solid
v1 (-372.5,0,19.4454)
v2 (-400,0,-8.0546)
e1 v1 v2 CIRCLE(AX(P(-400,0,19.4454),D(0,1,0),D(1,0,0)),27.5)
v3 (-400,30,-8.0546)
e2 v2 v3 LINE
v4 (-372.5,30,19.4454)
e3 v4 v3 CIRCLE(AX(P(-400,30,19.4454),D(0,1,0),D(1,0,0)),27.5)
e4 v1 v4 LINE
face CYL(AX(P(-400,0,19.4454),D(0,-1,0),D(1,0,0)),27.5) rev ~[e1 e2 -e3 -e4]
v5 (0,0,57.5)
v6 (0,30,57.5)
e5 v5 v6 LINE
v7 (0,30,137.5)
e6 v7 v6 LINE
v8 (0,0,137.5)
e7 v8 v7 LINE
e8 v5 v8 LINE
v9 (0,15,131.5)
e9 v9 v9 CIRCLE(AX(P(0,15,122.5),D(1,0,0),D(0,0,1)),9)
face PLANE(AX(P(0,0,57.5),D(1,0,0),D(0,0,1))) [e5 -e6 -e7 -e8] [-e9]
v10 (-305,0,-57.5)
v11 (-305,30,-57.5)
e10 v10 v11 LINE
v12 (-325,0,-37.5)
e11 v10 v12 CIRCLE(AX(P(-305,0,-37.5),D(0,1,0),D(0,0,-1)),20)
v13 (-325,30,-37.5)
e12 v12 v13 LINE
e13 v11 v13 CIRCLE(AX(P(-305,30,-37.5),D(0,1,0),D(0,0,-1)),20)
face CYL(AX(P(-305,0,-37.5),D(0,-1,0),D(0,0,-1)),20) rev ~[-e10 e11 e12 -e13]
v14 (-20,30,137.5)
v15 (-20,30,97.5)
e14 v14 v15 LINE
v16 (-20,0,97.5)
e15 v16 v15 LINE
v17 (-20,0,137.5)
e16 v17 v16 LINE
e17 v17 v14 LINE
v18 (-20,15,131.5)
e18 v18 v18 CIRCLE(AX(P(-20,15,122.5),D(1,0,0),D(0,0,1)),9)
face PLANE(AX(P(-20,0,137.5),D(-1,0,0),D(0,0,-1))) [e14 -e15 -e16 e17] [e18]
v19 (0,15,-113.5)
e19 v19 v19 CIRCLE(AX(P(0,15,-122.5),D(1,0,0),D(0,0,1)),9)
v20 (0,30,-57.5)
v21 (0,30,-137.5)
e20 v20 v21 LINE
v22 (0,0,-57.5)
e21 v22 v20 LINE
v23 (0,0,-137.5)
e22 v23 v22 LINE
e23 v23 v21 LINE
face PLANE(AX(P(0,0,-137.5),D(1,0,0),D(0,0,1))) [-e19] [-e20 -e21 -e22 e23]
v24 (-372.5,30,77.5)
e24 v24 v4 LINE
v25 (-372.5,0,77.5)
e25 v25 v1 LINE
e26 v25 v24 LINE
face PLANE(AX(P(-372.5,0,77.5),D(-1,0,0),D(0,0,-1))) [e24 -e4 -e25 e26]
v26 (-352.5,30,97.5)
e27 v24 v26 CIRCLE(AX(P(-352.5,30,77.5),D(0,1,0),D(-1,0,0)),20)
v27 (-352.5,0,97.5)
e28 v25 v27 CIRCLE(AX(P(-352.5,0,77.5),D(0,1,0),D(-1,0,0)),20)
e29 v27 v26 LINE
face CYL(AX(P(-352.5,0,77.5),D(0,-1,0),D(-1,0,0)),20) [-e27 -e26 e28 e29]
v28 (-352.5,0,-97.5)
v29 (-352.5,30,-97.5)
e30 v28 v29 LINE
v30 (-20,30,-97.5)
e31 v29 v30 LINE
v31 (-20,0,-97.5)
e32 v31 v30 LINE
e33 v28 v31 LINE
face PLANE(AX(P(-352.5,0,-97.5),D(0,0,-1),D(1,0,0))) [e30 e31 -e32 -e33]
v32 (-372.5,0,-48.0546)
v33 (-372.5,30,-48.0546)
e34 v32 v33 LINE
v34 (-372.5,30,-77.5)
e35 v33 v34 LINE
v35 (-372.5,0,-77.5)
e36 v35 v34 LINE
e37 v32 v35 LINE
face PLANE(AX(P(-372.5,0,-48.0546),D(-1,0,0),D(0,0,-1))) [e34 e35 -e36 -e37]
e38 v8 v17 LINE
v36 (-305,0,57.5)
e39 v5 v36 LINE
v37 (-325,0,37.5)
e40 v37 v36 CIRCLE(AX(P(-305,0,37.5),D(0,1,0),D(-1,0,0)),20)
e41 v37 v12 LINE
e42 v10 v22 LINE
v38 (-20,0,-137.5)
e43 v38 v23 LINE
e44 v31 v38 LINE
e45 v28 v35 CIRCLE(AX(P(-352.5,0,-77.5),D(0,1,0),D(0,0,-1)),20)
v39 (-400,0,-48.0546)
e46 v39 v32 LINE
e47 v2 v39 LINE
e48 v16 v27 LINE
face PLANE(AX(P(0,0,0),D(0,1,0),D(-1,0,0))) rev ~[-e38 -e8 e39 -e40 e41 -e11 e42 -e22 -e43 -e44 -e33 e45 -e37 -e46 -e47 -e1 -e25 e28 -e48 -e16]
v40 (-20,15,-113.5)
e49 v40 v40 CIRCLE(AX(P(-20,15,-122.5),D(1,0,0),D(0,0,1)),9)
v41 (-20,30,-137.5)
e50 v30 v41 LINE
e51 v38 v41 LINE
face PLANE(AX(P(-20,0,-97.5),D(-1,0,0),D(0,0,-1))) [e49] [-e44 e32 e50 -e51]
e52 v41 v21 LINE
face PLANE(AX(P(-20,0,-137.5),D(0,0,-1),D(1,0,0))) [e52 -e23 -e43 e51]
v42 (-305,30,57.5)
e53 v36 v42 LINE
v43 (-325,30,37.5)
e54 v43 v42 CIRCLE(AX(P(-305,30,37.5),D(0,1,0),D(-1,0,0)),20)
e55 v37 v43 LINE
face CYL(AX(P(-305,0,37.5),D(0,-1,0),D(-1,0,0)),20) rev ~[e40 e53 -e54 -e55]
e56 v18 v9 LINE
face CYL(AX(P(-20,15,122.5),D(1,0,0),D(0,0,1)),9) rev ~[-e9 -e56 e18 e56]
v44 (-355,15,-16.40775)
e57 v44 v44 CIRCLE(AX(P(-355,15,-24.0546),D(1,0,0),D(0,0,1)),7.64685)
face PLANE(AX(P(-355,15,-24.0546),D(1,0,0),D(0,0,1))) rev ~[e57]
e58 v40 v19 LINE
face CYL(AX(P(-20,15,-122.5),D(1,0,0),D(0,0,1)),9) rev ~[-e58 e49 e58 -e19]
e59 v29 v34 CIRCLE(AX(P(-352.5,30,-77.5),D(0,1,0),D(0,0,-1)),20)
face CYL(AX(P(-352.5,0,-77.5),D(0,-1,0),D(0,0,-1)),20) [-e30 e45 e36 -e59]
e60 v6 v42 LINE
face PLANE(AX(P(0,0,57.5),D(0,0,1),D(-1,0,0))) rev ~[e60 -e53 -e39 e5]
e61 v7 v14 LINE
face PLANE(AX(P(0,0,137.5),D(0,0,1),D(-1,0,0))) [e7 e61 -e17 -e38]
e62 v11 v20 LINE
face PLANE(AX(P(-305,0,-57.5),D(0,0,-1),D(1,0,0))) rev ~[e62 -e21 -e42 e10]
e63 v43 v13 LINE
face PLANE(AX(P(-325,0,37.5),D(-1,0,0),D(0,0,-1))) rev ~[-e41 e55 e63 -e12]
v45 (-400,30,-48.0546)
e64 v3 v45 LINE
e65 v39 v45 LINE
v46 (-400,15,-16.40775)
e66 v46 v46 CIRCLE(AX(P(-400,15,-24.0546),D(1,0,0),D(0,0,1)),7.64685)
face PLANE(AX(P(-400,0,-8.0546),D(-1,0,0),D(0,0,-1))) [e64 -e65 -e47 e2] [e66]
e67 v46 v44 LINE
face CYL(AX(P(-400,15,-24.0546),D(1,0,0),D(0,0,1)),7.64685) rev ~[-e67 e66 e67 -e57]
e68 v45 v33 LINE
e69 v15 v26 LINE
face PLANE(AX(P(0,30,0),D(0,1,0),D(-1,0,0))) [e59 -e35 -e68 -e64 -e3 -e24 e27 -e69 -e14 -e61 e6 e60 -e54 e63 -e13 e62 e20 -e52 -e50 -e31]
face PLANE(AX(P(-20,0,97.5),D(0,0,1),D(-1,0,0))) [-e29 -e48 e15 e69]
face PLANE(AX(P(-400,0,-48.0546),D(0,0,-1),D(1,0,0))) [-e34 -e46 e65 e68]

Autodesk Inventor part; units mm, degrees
ref_plane "YZ Plane" through (0, 0, 0) normal (1, 0, 0) x (0, 1, 0)
ref_plane "XZ Plane" through (0, 0, 0) normal (0, 1, 0) x (-1, 0, 0)
ref_plane "XY Plane" through (0, 0, 0) normal (0, 0, 1) x (1, 0, 0)
sketch "Skizze1" plane through (0, 0, 0) normal (0, 1, 0) x (-1, 0, 0)
  line L0 (0, 0) -> (380.5546, 0) construction
  line L1 (20, 97.5) -> (352.5, 97.5)
  line L2 (352.5, -97.5) -> (20, -97.5)
  line L3 (0, 76.1809) -> (0, 137.5)
  line L4 (0, 137.5) -> (20, 137.5)
  line L5 (20, 137.5) -> (20, 97.5)
  line L6 (20, -97.5) -> (20, -137.5)
  line L7 (20, -137.5) -> (0, -137.5)
  line L8 (0, -137.5) -> (0, -73.203)
  line L9 (400, -8.0546) -> (400, -8.0546)
  line L10 (400, -8.0546) -> (400, -48.0546)
  line L11 (400, -48.0546) -> (372.5, -48.0546)
  line L12 (0, 57.5) -> (305, 57.5)
  line L13 (325, 37.5) -> (325, -37.5)
  line L14 (305, -57.5) -> (0, -57.5)
  line L15 (0, -73.203) -> (0, -57.5)
  line L16 (0, 57.5) -> (0, 76.1809)
  line L17 (372.5, 77.5) -> (372.5, 19.4454)
  line L18 (372.5, -48.0546) -> (372.5, -77.5)
  arc A0 (372.5, 19.4454) -> (400, -8.0546) centre (400, 19.4454) ccw
  arc A1 (372.5, 77.5) -> (352.5, 97.5) centre (352.5, 77.5) ccw
  arc A2 (352.5, -97.5) -> (372.5, -77.5) centre (352.5, -77.5) ccw
  arc A3 (325, 37.5) -> (305, 57.5) centre (305, 37.5) ccw
  arc A4 (305, -57.5) -> (325, -37.5) centre (305, -37.5) ccw
  point P0 (372.5, 48.4727)
  dimension "d3" = 57.5
  dimension "d4" = 57.5
  dimension "d7" = 20
  dimension "d8" = 20
  dimension "d11" = 40
  dimension "d12" = 47.5
  dimension "d13" = 27.5
  dimension "d14" = 27.5
  dimension "d18" = 97.5
  dimension "d19" = 97.5
  dimension "d20" = 20
  dimension "d22" = 40
  dimension "d24" = 305
  dimension "d45" = 40
  dimension "d46" = 40
  dimension "d47" = 40
extrude "Extrusion1" add sketch "Skizze1" along normal blind 30
sketch "Skizze2" plane through (-400, 0, -48.0546) normal (-1, 0, 0) x (0, 0, 1)
  line L0 (0, 0) -> (0, 30) projected
  line L1 (0, 0) -> (40, 0) projected
  point P0 (48.0546, 0)
  point P1 (24, 15)
  point P2 (0, 15)
  dimension "d34" = 24
hole "Bohrung1" at (-400, 15, -24.0546) direction (1, 0, 0) diameter 15.2937 depth 45 thread size "M18x2.5" class "6H" standard "ISO Metric profile"
sketch "Skizze3" plane through (-20, 0, 97.5) normal (-1, 0, 0) x (0, 0, 1)
  line L0 (40, 0) -> (40, 30) projected
  line L1 (-235, 0) -> (-235, 30) projected
  point P0 (-97.5, 0)
  point P1 (25, 15)
  point P2 (-220, 15)
  point P3 (40, 15)
  point P4 (-235, 15)
  dimension "d43" = 15
  dimension "d44" = 15
hole "Bohrung2" at (-20, 15, 122.5) at (-20, 15, -122.5) direction (1, 0, 0) diameter 18 depth 20
equation "\"d4\" = d3"
equation "\"d8\" = d7"
equation "\"d46\" = d45"
equation "\"d47\" = d22"
properties part number "2" material "Kupfer, Legierung"
